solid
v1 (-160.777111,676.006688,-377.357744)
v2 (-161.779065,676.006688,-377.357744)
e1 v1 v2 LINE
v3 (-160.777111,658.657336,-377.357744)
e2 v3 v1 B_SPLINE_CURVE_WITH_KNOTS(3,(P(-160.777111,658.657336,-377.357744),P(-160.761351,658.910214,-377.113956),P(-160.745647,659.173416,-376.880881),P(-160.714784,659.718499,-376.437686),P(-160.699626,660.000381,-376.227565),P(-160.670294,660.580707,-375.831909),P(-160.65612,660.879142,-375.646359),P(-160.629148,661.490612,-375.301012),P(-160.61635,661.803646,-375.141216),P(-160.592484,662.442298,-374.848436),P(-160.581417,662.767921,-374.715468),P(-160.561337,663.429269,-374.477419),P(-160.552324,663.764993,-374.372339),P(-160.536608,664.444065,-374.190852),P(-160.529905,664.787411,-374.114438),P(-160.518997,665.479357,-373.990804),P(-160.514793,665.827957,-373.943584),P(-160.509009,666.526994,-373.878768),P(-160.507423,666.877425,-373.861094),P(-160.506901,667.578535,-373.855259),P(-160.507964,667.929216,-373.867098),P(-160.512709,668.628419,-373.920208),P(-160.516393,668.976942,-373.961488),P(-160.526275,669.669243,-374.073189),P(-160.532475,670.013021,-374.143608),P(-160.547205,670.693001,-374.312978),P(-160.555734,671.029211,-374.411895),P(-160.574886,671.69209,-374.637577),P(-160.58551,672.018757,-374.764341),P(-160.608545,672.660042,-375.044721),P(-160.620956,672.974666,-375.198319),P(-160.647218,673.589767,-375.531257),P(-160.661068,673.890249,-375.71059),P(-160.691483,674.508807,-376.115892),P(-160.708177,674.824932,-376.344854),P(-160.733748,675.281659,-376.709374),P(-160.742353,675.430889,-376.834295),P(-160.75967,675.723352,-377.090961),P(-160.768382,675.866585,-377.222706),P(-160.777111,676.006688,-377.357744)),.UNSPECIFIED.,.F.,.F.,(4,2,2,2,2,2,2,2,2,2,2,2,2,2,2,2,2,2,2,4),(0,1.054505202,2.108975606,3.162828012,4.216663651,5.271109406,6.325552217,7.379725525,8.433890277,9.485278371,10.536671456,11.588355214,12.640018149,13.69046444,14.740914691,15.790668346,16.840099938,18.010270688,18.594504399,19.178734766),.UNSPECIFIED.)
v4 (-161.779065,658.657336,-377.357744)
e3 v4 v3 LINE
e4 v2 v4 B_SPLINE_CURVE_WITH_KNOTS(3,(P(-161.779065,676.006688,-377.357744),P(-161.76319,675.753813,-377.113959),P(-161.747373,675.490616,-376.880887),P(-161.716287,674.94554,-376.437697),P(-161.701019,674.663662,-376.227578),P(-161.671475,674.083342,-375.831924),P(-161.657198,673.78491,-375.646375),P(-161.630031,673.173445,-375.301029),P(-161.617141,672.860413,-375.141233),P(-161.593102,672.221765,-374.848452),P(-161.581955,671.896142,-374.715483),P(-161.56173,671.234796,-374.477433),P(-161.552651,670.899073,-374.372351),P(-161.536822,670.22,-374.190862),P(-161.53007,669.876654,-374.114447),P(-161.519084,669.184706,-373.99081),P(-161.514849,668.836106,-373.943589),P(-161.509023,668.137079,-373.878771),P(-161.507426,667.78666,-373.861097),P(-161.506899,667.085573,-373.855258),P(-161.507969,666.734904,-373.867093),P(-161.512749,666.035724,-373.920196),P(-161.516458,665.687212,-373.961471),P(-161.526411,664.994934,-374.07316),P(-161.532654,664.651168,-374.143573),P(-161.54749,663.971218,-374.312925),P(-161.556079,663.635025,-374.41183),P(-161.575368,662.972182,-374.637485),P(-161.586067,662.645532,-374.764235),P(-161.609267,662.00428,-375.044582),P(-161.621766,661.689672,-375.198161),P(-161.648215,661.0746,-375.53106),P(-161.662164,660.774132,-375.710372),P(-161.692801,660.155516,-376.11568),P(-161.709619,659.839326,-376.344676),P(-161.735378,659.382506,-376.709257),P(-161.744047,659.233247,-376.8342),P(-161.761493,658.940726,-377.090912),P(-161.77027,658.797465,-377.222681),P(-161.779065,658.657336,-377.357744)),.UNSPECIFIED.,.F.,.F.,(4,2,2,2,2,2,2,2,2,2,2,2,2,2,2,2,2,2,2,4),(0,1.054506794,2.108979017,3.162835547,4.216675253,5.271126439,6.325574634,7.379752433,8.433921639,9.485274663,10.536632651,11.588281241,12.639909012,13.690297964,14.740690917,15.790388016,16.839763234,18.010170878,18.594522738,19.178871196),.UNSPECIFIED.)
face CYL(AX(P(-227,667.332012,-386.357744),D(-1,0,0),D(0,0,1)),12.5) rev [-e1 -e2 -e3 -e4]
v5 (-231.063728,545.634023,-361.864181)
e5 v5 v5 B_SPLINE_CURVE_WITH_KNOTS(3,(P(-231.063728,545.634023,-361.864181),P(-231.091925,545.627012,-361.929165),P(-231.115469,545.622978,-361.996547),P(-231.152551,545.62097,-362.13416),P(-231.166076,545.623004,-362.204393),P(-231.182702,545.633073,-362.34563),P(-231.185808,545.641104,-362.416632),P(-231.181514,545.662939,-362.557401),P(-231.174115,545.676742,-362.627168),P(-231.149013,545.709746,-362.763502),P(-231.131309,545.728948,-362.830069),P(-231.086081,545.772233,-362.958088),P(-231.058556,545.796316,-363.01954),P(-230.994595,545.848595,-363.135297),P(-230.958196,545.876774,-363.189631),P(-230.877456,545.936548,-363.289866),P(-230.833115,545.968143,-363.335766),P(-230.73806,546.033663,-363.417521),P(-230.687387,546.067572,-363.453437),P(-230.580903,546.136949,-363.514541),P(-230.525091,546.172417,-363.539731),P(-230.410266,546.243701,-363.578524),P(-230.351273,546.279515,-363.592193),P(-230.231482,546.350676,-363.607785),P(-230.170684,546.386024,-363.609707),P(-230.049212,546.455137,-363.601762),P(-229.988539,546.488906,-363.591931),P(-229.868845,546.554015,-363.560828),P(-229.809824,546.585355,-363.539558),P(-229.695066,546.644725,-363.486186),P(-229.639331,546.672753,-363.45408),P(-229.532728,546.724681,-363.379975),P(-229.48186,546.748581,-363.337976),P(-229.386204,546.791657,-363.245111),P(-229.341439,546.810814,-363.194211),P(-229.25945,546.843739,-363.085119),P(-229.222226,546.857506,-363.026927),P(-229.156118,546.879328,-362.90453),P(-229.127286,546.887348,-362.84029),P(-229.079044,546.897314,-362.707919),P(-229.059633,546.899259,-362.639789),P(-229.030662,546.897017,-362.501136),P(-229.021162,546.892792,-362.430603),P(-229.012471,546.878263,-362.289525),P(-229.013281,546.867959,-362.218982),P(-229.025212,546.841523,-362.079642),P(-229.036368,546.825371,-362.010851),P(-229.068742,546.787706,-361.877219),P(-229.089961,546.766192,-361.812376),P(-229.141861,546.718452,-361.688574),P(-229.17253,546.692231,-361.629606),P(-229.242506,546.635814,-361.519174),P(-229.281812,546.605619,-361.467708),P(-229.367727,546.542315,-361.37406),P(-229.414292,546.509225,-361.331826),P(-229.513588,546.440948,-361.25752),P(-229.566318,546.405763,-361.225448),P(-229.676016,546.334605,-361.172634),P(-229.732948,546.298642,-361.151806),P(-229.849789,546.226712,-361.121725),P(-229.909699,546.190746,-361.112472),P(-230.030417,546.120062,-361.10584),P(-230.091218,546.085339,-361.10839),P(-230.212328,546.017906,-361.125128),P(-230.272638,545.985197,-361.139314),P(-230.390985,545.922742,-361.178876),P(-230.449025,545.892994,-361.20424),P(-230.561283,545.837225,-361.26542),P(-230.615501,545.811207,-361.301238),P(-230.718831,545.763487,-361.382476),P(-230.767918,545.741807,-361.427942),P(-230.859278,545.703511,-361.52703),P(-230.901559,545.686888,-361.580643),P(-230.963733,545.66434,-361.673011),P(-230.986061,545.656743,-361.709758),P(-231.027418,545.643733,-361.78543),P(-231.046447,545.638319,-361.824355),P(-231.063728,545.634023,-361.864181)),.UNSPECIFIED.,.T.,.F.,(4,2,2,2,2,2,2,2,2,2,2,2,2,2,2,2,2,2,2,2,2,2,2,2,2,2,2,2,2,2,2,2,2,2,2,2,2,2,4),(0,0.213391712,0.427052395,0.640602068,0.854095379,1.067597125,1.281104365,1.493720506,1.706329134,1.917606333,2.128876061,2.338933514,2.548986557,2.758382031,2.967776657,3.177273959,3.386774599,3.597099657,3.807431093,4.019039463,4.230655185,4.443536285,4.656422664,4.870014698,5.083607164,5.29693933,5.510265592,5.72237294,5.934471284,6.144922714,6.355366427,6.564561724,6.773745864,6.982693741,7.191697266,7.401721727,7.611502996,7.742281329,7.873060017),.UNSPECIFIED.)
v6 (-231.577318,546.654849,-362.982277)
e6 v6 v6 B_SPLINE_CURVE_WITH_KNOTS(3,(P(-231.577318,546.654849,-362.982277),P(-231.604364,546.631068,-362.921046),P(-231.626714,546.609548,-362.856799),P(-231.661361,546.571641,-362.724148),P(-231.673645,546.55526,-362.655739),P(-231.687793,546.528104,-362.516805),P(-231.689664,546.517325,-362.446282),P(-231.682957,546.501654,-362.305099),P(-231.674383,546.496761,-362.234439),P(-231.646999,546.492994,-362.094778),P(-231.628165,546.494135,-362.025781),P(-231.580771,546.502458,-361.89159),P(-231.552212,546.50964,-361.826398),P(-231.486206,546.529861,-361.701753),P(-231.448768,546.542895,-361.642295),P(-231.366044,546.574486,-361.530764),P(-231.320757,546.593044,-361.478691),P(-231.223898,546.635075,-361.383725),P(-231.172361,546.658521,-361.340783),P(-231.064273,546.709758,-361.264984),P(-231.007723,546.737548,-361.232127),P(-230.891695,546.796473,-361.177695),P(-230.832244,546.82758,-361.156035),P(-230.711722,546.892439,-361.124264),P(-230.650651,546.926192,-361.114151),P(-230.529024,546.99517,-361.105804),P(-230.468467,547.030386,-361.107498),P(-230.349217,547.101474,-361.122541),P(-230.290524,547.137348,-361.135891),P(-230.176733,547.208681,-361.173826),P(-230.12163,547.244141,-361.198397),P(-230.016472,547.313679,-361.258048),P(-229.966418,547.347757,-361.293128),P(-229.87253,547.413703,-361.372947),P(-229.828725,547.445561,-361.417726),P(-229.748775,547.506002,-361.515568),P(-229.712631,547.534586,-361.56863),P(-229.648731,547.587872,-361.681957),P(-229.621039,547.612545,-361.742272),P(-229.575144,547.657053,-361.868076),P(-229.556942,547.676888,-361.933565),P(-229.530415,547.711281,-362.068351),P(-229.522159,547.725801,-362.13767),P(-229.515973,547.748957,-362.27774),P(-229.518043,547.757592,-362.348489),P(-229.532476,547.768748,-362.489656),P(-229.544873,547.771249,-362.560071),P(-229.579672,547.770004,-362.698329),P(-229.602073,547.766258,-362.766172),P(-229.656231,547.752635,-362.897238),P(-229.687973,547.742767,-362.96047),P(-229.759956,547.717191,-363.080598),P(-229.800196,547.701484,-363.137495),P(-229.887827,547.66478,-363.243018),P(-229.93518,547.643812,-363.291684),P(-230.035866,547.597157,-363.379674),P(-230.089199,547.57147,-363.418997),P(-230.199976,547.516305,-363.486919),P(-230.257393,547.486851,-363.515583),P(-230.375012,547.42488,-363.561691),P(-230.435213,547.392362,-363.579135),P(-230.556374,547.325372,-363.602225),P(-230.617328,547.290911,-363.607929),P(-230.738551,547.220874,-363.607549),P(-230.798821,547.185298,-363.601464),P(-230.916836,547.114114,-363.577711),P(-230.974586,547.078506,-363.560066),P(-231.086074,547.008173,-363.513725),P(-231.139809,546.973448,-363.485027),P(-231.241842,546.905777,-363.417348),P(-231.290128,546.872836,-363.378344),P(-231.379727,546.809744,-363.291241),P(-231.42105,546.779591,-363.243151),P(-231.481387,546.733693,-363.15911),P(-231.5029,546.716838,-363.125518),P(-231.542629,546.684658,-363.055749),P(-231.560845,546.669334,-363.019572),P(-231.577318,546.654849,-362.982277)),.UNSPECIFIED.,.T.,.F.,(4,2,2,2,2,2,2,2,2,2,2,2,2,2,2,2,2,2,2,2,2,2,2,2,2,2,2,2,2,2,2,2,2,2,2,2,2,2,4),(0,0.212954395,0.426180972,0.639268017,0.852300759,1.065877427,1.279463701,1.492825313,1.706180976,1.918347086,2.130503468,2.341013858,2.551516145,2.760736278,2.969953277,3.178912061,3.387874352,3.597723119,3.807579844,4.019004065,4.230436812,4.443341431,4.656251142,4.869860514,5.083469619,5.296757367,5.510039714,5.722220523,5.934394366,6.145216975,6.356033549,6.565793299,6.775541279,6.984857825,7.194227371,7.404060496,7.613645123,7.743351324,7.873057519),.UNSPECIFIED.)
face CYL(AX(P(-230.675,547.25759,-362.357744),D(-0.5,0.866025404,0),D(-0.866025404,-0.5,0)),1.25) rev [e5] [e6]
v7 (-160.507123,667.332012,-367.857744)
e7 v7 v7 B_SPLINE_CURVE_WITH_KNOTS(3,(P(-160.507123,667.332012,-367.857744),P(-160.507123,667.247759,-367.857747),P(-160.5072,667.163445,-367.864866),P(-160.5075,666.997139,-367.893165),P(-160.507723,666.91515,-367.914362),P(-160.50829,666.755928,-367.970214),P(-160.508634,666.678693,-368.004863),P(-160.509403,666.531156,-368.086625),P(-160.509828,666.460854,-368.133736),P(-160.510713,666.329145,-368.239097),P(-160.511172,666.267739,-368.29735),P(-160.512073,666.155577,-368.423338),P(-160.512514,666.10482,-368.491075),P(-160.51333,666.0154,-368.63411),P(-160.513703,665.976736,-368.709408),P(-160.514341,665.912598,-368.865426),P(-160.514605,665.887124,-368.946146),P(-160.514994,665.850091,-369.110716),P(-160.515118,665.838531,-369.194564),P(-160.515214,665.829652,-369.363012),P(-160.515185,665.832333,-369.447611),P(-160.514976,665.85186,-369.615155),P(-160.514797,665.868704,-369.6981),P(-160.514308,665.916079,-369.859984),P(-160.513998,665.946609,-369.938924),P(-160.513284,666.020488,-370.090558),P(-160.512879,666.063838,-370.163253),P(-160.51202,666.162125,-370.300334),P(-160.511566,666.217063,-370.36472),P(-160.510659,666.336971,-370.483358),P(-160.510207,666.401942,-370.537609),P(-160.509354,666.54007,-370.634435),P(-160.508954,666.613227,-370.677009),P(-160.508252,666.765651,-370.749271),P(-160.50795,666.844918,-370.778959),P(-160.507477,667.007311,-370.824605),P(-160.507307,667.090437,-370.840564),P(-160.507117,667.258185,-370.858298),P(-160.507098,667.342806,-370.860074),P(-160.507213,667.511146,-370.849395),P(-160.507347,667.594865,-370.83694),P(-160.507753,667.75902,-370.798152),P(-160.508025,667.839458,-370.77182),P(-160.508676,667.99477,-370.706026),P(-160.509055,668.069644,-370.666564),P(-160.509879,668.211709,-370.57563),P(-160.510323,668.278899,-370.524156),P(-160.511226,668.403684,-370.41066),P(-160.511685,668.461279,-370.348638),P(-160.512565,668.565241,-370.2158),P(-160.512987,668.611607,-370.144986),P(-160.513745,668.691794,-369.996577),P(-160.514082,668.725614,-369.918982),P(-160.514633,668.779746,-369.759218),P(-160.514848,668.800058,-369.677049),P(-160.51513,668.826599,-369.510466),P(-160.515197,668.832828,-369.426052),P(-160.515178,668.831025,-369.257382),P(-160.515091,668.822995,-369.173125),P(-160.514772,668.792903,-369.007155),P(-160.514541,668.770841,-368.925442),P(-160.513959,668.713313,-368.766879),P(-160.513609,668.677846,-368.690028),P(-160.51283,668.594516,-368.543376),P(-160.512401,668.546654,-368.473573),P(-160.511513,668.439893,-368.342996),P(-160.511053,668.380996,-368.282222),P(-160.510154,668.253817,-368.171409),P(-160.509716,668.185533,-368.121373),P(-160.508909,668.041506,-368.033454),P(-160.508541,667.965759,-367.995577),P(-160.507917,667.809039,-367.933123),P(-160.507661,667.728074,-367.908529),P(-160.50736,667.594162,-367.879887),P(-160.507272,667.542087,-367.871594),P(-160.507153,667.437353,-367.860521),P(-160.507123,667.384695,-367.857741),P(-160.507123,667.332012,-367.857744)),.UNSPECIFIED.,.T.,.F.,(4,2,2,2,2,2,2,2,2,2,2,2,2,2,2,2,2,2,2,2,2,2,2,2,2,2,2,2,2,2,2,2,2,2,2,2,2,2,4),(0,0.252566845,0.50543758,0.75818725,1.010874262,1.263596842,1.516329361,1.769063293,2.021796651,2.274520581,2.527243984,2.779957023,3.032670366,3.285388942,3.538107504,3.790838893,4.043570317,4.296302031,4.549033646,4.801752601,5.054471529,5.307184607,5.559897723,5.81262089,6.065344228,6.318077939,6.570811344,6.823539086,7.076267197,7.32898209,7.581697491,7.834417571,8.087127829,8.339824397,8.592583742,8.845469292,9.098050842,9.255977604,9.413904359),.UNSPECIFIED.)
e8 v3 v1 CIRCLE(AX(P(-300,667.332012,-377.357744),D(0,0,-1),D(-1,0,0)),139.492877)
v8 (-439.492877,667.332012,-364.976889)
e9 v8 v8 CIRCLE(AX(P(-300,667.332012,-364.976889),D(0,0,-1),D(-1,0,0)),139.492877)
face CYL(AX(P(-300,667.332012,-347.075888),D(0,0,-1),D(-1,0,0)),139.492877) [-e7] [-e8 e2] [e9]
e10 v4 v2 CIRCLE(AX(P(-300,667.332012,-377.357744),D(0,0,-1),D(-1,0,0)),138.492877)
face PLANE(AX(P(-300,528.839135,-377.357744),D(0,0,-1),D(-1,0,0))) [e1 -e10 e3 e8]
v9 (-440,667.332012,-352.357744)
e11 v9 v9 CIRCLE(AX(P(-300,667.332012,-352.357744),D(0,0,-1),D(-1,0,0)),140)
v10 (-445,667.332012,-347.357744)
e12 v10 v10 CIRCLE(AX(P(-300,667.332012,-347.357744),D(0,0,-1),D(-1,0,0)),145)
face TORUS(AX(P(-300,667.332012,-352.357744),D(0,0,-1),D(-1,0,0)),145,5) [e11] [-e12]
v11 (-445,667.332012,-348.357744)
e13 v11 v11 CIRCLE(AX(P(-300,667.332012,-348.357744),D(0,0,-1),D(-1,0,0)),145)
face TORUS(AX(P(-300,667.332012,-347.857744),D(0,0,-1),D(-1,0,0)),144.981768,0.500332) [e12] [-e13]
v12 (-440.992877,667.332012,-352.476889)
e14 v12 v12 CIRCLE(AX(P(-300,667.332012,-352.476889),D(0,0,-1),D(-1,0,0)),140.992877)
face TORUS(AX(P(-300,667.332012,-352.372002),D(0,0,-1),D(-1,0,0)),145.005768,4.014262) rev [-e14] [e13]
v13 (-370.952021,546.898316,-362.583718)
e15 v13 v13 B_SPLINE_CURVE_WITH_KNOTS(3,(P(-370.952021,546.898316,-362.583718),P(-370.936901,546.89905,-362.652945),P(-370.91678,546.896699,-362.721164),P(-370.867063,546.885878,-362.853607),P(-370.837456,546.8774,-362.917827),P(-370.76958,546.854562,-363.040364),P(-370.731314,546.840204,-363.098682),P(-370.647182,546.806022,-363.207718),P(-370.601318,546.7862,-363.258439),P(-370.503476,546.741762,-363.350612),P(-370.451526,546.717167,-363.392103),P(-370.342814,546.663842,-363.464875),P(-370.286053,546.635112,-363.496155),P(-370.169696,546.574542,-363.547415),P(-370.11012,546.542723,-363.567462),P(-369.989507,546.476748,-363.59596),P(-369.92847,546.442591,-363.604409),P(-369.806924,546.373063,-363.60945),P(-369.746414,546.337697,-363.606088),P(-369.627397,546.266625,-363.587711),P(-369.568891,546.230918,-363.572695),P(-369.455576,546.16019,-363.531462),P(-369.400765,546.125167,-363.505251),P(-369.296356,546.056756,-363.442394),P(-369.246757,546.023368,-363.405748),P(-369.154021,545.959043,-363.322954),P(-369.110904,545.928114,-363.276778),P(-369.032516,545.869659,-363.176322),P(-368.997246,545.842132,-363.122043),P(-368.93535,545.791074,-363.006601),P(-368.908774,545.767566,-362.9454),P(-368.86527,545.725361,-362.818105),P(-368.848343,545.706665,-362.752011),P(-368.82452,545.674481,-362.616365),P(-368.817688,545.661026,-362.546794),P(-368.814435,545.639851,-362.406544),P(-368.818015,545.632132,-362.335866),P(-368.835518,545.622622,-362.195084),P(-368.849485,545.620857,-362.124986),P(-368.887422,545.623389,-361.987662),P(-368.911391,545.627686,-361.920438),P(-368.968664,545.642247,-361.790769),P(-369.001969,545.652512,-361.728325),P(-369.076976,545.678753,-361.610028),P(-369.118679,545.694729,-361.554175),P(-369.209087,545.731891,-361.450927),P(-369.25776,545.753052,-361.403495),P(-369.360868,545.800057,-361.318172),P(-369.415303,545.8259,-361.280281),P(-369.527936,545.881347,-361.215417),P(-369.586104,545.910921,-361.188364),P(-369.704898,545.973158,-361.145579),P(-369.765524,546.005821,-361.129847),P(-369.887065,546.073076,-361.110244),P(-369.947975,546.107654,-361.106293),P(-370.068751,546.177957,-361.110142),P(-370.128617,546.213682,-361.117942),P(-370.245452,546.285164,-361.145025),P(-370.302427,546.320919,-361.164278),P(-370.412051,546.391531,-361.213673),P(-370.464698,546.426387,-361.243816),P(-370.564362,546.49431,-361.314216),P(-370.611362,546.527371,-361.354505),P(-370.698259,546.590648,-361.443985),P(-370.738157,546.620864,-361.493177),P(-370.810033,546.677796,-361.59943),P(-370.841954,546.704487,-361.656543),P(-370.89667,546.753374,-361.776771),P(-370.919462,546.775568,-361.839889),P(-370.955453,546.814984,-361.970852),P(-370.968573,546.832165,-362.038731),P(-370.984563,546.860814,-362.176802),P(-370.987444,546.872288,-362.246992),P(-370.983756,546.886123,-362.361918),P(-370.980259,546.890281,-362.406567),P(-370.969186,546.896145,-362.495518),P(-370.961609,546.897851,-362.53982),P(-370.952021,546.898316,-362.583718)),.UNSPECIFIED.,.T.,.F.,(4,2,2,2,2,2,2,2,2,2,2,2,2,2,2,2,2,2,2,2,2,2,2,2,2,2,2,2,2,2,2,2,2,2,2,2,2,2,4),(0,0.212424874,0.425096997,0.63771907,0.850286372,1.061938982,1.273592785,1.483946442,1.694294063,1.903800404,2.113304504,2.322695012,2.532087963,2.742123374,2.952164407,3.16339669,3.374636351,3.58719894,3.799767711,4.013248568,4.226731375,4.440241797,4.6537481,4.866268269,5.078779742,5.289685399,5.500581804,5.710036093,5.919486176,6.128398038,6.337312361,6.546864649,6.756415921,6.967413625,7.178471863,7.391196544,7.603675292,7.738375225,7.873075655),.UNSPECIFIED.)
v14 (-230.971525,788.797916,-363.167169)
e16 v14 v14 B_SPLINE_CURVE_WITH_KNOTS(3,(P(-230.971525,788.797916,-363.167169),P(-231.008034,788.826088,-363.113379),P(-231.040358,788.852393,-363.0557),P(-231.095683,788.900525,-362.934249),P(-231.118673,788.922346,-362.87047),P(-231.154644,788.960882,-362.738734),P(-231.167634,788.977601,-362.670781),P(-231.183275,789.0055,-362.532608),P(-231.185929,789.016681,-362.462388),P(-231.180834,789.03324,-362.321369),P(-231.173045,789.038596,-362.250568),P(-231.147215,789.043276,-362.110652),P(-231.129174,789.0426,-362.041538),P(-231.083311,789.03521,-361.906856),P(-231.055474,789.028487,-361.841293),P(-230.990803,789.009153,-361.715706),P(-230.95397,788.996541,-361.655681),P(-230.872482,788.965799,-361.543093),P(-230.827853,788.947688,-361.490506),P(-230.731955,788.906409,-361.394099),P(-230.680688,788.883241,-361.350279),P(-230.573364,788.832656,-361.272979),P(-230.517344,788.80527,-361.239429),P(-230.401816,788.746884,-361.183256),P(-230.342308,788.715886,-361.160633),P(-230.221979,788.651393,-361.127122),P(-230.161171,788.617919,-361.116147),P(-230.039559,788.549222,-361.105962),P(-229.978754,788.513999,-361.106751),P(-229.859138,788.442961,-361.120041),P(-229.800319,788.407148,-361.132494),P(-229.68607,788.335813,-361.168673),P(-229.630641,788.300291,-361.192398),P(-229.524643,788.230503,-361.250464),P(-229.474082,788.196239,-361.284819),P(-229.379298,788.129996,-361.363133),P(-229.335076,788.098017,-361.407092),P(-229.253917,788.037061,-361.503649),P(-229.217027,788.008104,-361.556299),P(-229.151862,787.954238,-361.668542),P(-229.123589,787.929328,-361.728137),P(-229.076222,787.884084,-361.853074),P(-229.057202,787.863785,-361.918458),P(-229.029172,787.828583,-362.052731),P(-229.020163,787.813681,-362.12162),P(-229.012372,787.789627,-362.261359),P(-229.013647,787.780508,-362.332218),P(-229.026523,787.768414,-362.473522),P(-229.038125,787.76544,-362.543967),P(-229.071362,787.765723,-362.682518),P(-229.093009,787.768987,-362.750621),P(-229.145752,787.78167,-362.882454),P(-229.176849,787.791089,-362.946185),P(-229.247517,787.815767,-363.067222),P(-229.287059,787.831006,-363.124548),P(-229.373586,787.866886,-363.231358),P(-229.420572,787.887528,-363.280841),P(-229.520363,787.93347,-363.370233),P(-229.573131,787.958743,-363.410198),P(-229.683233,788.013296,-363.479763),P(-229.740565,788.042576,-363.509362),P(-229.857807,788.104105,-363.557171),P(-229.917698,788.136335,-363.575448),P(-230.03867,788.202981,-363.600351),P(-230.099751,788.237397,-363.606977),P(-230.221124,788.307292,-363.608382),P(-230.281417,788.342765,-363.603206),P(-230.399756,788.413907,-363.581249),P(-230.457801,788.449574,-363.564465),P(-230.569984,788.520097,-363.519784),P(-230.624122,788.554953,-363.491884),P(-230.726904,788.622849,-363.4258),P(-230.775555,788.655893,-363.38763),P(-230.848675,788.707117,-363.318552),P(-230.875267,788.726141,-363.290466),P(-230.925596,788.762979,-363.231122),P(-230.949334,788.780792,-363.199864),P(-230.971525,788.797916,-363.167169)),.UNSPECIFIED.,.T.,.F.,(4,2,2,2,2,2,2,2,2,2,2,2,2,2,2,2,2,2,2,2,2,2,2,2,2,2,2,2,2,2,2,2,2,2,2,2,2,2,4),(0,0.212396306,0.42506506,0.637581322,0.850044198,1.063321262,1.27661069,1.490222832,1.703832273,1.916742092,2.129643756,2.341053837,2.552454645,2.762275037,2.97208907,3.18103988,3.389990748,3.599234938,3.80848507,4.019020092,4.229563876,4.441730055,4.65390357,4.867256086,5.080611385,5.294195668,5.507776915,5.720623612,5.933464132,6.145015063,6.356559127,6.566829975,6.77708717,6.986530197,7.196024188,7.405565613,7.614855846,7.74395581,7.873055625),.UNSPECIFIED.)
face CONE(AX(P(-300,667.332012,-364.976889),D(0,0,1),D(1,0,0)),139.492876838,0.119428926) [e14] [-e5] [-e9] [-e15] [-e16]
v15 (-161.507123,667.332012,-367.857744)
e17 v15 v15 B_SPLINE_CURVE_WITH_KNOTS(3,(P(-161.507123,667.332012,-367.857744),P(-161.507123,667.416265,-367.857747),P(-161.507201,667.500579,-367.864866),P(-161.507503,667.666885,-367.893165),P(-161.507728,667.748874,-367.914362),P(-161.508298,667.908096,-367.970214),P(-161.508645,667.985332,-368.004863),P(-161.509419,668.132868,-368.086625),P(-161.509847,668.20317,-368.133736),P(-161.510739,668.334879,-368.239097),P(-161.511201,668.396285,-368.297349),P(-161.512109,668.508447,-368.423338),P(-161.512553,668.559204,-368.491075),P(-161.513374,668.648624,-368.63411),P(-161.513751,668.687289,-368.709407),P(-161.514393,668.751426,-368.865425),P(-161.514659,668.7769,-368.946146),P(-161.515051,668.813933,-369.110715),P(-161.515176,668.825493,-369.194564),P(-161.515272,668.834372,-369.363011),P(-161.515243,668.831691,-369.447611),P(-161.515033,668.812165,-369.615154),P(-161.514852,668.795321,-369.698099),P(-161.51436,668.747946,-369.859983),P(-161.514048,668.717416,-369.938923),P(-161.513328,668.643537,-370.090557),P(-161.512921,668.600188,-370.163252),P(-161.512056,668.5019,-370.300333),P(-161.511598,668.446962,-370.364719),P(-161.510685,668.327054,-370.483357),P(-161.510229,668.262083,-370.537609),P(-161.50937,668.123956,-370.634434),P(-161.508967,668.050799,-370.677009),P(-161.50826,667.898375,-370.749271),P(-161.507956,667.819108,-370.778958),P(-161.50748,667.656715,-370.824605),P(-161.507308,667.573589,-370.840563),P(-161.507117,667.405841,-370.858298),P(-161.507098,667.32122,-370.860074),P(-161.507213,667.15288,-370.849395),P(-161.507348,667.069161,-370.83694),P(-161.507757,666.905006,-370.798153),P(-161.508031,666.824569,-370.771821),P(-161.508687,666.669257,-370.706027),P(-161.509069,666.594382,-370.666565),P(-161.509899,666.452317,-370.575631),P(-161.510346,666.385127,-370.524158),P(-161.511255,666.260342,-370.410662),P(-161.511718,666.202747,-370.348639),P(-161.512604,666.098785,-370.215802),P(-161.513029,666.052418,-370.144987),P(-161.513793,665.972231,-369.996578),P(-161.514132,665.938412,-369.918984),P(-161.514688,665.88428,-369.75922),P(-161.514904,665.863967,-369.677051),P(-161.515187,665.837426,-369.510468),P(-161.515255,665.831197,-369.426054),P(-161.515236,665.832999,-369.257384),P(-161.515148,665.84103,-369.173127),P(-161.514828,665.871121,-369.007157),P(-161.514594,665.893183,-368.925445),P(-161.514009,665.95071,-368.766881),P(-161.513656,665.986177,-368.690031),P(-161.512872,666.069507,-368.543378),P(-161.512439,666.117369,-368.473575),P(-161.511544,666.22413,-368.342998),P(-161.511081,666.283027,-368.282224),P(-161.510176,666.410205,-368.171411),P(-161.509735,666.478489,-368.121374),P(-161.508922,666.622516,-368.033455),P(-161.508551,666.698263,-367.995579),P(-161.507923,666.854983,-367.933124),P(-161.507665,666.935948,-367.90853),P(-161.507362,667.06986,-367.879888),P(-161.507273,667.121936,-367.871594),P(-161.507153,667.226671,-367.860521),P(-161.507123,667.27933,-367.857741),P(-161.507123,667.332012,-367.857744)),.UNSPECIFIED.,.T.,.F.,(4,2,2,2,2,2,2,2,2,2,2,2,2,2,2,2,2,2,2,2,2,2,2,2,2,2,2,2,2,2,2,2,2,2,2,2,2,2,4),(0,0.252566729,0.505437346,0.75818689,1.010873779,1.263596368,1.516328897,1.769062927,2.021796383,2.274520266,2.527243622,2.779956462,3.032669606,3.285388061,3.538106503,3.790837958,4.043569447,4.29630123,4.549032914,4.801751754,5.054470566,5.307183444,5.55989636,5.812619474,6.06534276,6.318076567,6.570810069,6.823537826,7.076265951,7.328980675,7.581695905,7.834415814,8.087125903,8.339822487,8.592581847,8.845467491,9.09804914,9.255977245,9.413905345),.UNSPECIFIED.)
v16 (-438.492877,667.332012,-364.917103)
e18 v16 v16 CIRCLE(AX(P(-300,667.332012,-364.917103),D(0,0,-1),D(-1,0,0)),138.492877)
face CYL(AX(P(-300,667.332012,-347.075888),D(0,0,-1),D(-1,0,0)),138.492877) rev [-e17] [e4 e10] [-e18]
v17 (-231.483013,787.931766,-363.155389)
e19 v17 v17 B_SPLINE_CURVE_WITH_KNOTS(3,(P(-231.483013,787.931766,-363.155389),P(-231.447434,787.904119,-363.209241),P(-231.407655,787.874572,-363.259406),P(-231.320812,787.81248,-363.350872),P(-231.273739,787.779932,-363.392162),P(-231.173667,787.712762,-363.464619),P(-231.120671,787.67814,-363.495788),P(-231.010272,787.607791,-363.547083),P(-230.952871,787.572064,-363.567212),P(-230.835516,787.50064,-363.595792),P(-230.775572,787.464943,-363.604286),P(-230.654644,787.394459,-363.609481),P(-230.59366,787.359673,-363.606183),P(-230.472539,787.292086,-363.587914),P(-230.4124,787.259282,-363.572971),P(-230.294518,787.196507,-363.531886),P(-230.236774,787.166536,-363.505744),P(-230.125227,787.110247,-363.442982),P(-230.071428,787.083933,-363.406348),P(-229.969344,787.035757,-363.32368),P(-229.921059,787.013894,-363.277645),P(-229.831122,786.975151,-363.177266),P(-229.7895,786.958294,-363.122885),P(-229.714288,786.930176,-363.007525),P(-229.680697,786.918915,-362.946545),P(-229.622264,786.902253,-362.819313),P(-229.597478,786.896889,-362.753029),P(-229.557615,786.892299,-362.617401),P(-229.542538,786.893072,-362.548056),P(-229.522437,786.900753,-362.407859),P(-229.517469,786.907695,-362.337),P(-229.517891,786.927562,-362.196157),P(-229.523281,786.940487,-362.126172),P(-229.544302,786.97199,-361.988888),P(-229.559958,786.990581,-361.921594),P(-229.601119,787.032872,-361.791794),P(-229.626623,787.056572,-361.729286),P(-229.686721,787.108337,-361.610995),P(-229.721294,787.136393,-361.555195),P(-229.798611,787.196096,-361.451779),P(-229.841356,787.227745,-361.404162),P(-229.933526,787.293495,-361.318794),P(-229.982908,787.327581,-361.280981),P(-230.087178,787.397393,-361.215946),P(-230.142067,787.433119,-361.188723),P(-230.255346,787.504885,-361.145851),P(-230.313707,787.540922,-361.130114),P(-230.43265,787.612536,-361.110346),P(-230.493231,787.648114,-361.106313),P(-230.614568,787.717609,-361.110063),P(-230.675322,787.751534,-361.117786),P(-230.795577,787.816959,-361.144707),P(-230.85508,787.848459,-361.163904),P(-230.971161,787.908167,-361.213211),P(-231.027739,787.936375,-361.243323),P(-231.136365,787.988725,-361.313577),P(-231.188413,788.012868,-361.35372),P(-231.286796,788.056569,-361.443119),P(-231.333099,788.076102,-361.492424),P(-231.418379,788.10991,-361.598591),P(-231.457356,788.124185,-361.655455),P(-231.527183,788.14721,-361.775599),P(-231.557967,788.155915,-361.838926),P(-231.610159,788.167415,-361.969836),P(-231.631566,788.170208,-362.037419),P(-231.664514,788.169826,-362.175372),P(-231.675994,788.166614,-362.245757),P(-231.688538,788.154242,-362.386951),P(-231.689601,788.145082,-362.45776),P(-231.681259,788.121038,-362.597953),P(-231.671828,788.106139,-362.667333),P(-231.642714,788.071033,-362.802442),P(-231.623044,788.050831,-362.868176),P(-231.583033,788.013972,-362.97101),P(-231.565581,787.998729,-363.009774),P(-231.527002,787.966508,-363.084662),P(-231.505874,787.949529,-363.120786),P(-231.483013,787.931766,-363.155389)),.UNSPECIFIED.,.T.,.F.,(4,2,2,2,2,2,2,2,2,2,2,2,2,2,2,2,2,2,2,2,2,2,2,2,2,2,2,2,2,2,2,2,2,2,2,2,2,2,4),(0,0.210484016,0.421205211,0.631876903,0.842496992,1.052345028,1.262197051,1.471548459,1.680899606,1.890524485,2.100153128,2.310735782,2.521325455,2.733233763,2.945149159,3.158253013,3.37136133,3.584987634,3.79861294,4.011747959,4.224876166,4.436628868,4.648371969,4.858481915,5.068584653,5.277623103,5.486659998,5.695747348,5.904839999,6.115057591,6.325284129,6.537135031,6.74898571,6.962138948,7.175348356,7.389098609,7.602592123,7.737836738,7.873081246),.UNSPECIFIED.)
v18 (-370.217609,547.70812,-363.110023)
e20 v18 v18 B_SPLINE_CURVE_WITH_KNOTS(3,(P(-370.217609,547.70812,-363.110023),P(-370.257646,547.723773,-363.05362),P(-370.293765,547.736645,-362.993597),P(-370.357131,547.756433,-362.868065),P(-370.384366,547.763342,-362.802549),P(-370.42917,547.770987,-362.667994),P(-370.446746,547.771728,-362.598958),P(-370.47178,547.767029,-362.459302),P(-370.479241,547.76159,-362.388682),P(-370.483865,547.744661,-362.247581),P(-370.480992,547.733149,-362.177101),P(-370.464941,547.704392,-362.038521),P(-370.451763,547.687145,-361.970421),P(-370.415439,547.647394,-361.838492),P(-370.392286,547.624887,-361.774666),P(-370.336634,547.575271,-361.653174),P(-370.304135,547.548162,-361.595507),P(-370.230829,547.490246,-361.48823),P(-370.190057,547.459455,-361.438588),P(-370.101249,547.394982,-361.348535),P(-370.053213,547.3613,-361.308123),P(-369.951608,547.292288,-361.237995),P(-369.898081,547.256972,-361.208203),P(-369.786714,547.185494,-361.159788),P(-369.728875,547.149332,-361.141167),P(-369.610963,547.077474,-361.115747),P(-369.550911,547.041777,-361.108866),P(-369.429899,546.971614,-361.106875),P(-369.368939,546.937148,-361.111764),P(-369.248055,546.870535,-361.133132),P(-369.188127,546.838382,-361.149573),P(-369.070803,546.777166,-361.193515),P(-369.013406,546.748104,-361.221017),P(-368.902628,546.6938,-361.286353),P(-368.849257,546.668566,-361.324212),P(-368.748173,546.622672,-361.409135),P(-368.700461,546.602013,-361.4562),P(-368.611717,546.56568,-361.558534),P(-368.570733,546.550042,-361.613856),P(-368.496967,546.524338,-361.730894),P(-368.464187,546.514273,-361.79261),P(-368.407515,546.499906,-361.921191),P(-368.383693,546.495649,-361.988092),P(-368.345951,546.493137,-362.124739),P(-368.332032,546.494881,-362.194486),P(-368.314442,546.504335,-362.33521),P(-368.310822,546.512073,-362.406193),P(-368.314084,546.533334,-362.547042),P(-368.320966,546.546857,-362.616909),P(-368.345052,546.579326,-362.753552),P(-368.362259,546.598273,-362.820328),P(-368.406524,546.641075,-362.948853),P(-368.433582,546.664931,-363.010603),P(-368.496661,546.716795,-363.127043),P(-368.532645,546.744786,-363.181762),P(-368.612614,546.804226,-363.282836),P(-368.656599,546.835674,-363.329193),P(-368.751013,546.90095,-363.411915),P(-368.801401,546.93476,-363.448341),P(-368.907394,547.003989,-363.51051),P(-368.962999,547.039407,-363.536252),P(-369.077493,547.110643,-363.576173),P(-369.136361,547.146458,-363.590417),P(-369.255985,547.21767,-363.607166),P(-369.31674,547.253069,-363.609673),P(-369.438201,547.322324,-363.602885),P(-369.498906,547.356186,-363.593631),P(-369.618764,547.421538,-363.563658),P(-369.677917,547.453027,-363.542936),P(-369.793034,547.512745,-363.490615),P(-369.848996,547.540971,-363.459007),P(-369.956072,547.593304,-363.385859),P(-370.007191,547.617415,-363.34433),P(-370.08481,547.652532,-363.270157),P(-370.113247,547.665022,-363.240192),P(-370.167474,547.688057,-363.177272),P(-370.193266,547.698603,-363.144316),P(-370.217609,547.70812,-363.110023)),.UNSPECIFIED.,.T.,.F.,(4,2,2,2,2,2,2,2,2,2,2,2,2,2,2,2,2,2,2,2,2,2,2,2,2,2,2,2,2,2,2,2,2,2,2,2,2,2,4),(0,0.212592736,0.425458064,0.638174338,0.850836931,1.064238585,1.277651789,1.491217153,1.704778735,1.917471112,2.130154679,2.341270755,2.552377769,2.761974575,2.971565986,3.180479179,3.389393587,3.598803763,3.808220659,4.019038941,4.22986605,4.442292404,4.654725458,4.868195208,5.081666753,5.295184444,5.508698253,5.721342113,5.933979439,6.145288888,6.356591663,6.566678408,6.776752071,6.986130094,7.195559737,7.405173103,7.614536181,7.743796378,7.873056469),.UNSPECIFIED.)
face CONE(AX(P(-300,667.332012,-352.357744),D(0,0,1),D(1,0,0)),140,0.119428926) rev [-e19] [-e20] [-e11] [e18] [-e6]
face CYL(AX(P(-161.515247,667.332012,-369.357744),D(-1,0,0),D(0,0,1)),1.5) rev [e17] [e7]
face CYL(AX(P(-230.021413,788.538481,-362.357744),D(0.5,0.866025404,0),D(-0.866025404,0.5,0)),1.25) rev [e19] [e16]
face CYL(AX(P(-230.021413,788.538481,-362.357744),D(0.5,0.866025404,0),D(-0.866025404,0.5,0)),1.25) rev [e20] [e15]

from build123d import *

# Parameters (mm, degrees)
CUT_THICKEN1_START             = -161.779064873
CUT_THICKEN1_DEPTH             = 1.271941736
F_3_0_3_DIAMETER_HOLE1_D       = 3
F_3_0_3_DIAMETER_HOLE1_DEPTH   = 6.997347225
F_2_5_2_5_DIAMETER_HOLE1_D     = 2.5
F_2_5_2_5_DIAMETER_HOLE1_DEPTH = 60.082245303
F_2_5_2_5_DIAMETER_HOLE2_D     = 2.5
F_2_5_2_5_DIAMETER_HOLE2_DEPTH = 338.689419568


# Read off the part's stored shape, not the designer's step: Cut-Thicken1
with BuildPart() as part:
    # Sketch1 → Revolve1 (revolve)
    with BuildSketch(Plane(origin=(-300, 0, 0), x_dir=(0, -1, 0), z_dir=(-1, 0, 0)), mode=Mode.PRIVATE) as revolve1_sk:
        with BuildLine():
            Line((-527.332012287, -352.357743681), (-528.839135448, -364.91710336))
            Line((-528.839135448, -364.91710336), (-528.839135448, -377.357743681))
            Line((-528.839135448, -377.357743681), (-527.839135448, -377.357743681))
            Line((-527.839135448, -377.357743681), (-527.839135448, -364.976888902))
            Line((-527.839135448, -364.976888902), (-526.339135448, -352.476888902))
            ThreePointArc((-526.339135448, -352.476888902), (-525.203611847, -349.572885006), (-522.332012286, -348.357743681))
            ThreePointArc((-522.332012286, -348.357743681), (-521.849911622, -347.857743681), (-522.332012286, -347.357743681))
            ThreePointArc((-522.332012286, -347.357743681), (-525.867546192, -348.822209775), (-527.332012287, -352.357743681))
        make_face()
    revolve(revolve1_sk.sketch.rotate(Axis((-300, 667.332012286, -347.075887645), (0, 0, -1)), 90), axis=Axis((-300, 667.332012286, -347.075887645), (0, 0, -1)))

    # Cut-Thicken1 outline → Cut-Thicken1 (cut)
    with BuildSketch(Plane.YZ.offset(CUT_THICKEN1_START)):
        with BuildLine():
            ThreePointArc((676.006688073, -377.357743681), (667.332012287, -373.857743681), (658.6573365, -377.357743681))
            Line((658.6573365, -377.357743681), (676.006688073, -377.357743681))
        make_face()
    extrude(amount=CUT_THICKEN1_DEPTH, mode=Mode.SUBTRACT)

    # Ø3.0 (3) Diameter Hole1
    with Locations(Plane.ZY.offset(161.515246561)):
        with Locations((-369.357743681, 667.332012286)):
            Hole(F_3_0_3_DIAMETER_HOLE1_D / 2, depth=F_3_0_3_DIAMETER_HOLE1_DEPTH)

    # Ø2.5 (2.5) Diameter Hole1
    with Locations(Plane(origin=(-294.638237699, 510.328397547, 0), x_dir=(0.866025403784442, 0.4999999999999941, 0), z_dir=(-0.49999999999999417, 0.8660254037844421, 0))):
        with Locations((73.858385008, 362.357743681)):
            Hole(F_2_5_2_5_DIAMETER_HOLE1_D / 2, depth=F_2_5_2_5_DIAMETER_HOLE1_DEPTH)

    # Ø2.5 (2.5) Diameter Hole2
    with Locations(Plane(origin=(283.941824832, 491.801667003, 0), x_dir=(0.8660254037844352, -0.5000000000000062, 0), z_dir=(0.5000000000000061, 0.866025403784435, 0))):
        with Locations((-593.473627278, 362.357743681)):
            Hole(F_2_5_2_5_DIAMETER_HOLE2_D / 2, depth=F_2_5_2_5_DIAMETER_HOLE2_DEPTH)


solid = part.part
